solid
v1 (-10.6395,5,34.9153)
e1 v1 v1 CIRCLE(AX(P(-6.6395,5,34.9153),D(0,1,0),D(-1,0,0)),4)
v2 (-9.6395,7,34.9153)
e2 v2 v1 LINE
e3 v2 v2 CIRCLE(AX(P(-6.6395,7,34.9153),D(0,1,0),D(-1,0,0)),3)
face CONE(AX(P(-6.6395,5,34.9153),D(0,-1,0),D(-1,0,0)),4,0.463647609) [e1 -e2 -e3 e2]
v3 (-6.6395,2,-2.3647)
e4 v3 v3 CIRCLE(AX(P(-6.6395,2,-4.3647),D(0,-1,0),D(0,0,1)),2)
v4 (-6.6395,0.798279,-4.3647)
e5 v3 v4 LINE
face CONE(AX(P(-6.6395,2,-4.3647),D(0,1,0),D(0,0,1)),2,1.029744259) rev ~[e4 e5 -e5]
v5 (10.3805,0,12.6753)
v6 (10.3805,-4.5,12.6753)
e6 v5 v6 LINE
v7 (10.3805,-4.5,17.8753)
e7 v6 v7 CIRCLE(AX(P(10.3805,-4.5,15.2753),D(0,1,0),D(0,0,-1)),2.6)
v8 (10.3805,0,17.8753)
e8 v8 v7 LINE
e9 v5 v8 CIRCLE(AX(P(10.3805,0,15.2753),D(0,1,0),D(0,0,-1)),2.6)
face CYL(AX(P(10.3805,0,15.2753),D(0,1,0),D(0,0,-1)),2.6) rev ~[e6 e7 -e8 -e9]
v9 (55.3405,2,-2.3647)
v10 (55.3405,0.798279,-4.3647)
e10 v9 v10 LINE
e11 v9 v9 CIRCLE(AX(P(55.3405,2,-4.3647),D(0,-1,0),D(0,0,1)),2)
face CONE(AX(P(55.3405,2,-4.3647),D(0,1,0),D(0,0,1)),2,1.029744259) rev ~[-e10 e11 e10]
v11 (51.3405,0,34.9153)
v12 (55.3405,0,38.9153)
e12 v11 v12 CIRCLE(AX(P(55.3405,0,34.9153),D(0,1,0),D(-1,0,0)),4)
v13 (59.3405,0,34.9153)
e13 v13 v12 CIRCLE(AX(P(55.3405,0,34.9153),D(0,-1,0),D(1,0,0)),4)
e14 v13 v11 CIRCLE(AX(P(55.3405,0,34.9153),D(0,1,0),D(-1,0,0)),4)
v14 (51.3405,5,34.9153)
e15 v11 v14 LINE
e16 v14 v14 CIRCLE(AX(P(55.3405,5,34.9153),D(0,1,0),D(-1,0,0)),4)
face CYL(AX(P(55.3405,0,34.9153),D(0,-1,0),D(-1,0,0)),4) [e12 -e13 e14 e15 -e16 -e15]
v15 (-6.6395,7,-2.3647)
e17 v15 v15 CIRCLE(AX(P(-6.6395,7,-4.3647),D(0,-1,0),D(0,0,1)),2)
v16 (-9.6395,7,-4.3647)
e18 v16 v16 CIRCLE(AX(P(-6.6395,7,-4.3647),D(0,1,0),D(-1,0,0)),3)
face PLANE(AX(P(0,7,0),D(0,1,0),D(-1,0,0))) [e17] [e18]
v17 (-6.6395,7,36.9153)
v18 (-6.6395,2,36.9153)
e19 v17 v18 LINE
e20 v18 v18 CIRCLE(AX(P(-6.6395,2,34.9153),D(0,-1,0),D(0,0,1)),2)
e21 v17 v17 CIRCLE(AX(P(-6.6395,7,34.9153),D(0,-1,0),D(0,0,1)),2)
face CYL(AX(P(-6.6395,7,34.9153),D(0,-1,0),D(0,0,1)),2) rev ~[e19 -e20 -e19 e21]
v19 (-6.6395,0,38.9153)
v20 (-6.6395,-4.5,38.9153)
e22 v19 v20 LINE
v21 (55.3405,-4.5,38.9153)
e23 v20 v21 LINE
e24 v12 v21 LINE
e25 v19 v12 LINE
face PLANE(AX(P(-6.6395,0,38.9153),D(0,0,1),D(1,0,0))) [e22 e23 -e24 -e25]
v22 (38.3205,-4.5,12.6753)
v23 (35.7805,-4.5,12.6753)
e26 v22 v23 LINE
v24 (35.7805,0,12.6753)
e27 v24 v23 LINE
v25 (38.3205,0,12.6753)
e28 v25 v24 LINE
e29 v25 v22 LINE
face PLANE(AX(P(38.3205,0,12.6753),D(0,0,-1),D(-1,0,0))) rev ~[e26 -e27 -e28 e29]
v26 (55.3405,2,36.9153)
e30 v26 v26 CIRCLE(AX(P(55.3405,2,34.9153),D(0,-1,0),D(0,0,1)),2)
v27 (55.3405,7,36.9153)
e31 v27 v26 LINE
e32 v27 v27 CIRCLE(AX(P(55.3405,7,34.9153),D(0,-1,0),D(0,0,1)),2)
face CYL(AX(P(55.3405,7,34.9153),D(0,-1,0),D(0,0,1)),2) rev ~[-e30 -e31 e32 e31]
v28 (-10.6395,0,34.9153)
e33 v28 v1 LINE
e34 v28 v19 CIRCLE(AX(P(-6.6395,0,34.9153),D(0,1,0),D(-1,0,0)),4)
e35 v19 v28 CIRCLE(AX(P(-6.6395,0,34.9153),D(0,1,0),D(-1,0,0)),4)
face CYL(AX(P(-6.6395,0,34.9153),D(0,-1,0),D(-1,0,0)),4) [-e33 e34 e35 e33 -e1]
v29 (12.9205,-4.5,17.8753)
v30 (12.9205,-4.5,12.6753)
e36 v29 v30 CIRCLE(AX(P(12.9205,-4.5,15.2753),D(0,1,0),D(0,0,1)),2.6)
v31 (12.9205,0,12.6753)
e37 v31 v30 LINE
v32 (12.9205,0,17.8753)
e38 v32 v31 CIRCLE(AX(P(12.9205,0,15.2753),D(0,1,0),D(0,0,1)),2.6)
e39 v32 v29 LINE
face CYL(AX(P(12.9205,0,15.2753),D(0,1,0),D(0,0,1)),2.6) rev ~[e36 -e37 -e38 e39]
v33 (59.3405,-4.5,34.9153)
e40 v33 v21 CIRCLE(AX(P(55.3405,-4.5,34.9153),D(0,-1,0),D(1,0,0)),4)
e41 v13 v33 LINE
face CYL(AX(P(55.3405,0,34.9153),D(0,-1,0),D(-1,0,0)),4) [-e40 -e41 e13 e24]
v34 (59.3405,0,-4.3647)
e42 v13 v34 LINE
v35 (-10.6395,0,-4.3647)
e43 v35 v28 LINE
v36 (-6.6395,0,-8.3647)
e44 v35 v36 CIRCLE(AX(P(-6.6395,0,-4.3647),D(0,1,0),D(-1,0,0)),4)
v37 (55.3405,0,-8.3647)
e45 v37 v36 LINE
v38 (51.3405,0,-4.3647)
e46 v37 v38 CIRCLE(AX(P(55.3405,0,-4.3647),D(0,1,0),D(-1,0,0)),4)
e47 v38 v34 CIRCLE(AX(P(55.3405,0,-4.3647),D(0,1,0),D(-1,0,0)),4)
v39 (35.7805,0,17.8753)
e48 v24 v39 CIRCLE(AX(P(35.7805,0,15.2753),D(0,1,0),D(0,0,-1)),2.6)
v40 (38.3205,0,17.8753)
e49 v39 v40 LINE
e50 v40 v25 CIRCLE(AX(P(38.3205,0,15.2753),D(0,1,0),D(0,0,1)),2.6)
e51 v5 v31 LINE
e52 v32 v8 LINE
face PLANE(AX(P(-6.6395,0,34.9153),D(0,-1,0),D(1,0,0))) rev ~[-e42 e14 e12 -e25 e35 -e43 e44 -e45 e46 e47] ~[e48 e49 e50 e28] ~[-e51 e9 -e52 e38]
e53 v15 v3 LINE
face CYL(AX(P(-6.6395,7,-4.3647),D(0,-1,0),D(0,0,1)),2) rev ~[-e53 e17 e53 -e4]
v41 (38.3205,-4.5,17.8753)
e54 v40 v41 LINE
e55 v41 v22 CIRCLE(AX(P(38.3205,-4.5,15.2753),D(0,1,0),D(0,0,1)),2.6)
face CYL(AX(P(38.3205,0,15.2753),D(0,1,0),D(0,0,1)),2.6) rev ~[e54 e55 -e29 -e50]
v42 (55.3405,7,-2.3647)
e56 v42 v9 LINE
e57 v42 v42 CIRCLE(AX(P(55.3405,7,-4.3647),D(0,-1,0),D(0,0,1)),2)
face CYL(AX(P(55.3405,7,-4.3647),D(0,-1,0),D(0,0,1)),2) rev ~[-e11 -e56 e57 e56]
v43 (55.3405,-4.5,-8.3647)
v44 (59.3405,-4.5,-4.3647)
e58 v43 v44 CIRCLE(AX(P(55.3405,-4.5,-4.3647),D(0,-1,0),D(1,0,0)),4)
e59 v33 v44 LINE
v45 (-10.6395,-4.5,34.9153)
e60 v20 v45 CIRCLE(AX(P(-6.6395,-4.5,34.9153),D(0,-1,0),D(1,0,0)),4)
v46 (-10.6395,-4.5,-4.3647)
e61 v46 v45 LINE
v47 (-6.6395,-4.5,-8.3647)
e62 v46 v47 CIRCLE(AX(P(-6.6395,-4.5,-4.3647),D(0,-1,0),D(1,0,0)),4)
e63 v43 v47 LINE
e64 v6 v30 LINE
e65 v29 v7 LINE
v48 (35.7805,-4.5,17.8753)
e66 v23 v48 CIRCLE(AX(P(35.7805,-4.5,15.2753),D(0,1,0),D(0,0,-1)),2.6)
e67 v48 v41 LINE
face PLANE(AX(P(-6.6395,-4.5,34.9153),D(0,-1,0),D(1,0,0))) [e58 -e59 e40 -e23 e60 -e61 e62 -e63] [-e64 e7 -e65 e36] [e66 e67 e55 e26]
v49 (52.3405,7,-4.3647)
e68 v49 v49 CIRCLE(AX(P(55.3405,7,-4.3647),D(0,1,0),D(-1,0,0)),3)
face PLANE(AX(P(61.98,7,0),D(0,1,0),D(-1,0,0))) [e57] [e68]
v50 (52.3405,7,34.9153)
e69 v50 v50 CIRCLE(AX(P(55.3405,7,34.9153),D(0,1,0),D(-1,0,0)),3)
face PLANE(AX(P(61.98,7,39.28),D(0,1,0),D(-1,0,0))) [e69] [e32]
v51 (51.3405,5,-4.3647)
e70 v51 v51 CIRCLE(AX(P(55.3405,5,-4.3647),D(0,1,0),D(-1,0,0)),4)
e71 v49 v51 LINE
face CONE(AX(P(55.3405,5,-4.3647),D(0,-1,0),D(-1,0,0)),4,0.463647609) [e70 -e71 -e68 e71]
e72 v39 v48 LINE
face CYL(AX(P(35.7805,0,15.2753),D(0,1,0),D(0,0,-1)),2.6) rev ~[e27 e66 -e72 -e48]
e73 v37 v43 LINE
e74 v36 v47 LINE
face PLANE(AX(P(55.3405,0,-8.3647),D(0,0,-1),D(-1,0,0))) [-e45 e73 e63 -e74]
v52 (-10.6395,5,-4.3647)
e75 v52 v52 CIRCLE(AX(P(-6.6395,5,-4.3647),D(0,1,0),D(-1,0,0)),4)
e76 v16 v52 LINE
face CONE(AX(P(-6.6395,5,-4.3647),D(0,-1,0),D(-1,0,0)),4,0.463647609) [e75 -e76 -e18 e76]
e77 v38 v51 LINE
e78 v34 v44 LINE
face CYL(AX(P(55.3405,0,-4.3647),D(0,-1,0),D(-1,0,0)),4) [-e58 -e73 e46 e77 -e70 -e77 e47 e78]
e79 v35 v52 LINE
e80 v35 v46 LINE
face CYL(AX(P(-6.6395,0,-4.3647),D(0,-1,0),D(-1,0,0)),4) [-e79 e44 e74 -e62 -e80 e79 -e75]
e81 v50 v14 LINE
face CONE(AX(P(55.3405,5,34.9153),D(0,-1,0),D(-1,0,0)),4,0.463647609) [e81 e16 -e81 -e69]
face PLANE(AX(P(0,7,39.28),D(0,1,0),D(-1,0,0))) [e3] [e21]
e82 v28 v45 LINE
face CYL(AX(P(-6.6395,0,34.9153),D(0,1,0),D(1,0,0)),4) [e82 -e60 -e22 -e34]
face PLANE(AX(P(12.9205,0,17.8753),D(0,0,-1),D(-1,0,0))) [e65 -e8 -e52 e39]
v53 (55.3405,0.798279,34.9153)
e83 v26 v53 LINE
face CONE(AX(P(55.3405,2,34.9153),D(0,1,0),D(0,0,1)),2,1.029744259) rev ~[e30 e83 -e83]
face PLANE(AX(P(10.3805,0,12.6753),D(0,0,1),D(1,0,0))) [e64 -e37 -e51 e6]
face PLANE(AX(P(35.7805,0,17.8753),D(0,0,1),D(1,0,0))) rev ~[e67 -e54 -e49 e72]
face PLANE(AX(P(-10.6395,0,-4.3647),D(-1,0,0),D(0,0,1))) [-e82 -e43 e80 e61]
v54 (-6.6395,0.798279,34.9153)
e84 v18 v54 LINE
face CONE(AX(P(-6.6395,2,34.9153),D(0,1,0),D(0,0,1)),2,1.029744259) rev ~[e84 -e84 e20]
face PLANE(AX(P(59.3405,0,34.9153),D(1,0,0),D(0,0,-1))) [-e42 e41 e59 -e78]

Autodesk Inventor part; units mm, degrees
ref_plane "YZ Plane" through (0, 0, 0) normal (1, 0, 0) x (0, 1, 0)
ref_plane "XZ Plane" through (0, 0, 0) normal (0, 1, 0) x (-1, 0, 0)
ref_plane "XY Plane" through (0, 0, 0) normal (0, 0, 1) x (1, 0, 0)
sketch "proto-board hole layout" plane through (0, 0, 0) normal (0, 1, 0) x (-1, 0, 0)
  circle A0 centre (6.6395, -4.3647) radius 1.49
  circle A1 centre (-55.3405, -4.3647) radius 1.49
  circle A2 centre (-55.3405, 34.9153) radius 1.49
  circle A3 centre (6.6395, 34.9153) radius 1.49
  line L0 (5.1495, -4.3647) -> (-53.8505, -4.3647) construction
  line L1 (5.1495, 34.9153) -> (-53.8505, 34.9153) construction
  line L2 (-55.3405, 33.4253) -> (-55.3405, -2.8747) construction
  line L3 (6.6395, 33.4253) -> (6.6395, -2.8747) construction
  dimension "d0" = 2.98
  dimension "d1" = 59
  dimension "d2" = 36.3
sketch "Sketch3" plane through (0, 0, 0) normal (0, 1, 0) x (-1, 0, 0)
  circle A0 centre (6.6395, -4.3647) radius 1.49 projected
  circle A1 centre (6.6395, -4.3647) radius 4
  point P0 (0, 0)
  dimension "d15" = 8
extrude "Extrusion2" add sketch "Sketch3" along normal blind 7 contours A0 | A1
sketch "Sketch4" plane through (-6.6395, 7, -4.3647) normal (0, 1, 0) x (1, 0, 0)
  circle A0 centre (0, 0) radius 4 construction
  point P0 (6.6395, -4.3647)
hole "Hole1" at (-6.6395, 7, -4.3647) direction (0, -1, 0) diameter 4 depth 5 tip angle 118
chamfer "Chamfer1" distance 1 distance2 2 1 edges at (-2.6395, 7, -4.3647) measured on face at (-9.9293, 7, -4.7642)
pattern_sketch "Sketch Driven Pattern1" from (-6.6395, 0, -4.3647) copies at (55.3405, 0, -4.3647) at (55.3405, 0, 34.9153) at (-6.6395, 0, 34.9153)
sketch "Sketch5" plane through (-6.6395, 0, 34.9153) normal (0, -1, 0) x (1, 0, 0)
  circle A0 centre (0, 0) radius 4 projected
  circle A1 centre (61.98, 0) radius 4 projected
  circle A2 centre (61.98, -39.28) radius 4 projected
  circle A3 centre (0, -39.28) radius 4 projected
  line L0 (-4, 4) -> (65.98, 4)
  line L1 (65.98, 4) -> (65.98, -43.28)
  line L2 (65.98, -43.28) -> (-4, -43.28)
  line L3 (-4, -43.28) -> (-4, 4)
  point P0 (6.6395, -34.9153)
  point P1 (-4, 0)
  point P2 (-4, -39.28)
  point P3 (0, -43.28)
  point P4 (61.98, -43.28)
  point P5 (65.98, -39.28)
  point P6 (65.98, 0)
  point P7 (61.98, 4)
  point P8 (0, 4)
extrude "Extrusion3" add sketch "Sketch5" along normal blind 4.5 contours A0 | A0 L0 A1 L1 A2 L2 A3 L3 | A1 | A3 | A2
sketch "Sketch6" plane through (-6.6395, 0, 34.9153) normal (0, 1, 0) x (1, 0, 0)
  line L0 (0, 43.28) -> (61.98, 43.28) projected
  line L1 (30.99, 43.28) -> (30.99, -4) construction
  line L2 (61.98, -4) -> (0, -4) projected
  line L3 (-4, 0) -> (-4, 39.28) projected
  line L4 (-4, 19.64) -> (65.98, 19.64) construction
  line L5 (65.98, 39.28) -> (65.98, 0) projected
  line L6 (19.56, 19.64) -> (17.02, 19.64) construction
  line L7 (19.56, 17.04) -> (17.02, 17.04)
  line L8 (17.02, 22.24) -> (19.56, 22.24)
  arc A0 (19.56, 17.04) -> (19.56, 22.24) centre (19.56, 19.64) ccw
  arc A1 (17.02, 22.24) -> (17.02, 17.04) centre (17.02, 19.64) ccw
  line L9 (42.42, 17.04) -> (44.96, 17.04)
  line L10 (44.96, 22.24) -> (42.42, 22.24)
  arc A2 (42.42, 22.24) -> (42.42, 17.04) centre (42.42, 19.64) ccw
  arc A3 (44.96, 17.04) -> (44.96, 22.24) centre (44.96, 19.64) ccw
  point P0 (6.6395, 34.9153)
  point P1 (18.29, 19.64)
  point P2 (18.29, 22.24)
  point P3 (18.29, 17.04)
  dimension "d21" = 11.43
  dimension "d22" = 13.97
  dimension "d23" = 5.2
extrude "Extrusion4" cut sketch "Sketch6" against normal blind 4.5
properties part number "proto-board_standoffs_plate_t-slot-2inx1in"
